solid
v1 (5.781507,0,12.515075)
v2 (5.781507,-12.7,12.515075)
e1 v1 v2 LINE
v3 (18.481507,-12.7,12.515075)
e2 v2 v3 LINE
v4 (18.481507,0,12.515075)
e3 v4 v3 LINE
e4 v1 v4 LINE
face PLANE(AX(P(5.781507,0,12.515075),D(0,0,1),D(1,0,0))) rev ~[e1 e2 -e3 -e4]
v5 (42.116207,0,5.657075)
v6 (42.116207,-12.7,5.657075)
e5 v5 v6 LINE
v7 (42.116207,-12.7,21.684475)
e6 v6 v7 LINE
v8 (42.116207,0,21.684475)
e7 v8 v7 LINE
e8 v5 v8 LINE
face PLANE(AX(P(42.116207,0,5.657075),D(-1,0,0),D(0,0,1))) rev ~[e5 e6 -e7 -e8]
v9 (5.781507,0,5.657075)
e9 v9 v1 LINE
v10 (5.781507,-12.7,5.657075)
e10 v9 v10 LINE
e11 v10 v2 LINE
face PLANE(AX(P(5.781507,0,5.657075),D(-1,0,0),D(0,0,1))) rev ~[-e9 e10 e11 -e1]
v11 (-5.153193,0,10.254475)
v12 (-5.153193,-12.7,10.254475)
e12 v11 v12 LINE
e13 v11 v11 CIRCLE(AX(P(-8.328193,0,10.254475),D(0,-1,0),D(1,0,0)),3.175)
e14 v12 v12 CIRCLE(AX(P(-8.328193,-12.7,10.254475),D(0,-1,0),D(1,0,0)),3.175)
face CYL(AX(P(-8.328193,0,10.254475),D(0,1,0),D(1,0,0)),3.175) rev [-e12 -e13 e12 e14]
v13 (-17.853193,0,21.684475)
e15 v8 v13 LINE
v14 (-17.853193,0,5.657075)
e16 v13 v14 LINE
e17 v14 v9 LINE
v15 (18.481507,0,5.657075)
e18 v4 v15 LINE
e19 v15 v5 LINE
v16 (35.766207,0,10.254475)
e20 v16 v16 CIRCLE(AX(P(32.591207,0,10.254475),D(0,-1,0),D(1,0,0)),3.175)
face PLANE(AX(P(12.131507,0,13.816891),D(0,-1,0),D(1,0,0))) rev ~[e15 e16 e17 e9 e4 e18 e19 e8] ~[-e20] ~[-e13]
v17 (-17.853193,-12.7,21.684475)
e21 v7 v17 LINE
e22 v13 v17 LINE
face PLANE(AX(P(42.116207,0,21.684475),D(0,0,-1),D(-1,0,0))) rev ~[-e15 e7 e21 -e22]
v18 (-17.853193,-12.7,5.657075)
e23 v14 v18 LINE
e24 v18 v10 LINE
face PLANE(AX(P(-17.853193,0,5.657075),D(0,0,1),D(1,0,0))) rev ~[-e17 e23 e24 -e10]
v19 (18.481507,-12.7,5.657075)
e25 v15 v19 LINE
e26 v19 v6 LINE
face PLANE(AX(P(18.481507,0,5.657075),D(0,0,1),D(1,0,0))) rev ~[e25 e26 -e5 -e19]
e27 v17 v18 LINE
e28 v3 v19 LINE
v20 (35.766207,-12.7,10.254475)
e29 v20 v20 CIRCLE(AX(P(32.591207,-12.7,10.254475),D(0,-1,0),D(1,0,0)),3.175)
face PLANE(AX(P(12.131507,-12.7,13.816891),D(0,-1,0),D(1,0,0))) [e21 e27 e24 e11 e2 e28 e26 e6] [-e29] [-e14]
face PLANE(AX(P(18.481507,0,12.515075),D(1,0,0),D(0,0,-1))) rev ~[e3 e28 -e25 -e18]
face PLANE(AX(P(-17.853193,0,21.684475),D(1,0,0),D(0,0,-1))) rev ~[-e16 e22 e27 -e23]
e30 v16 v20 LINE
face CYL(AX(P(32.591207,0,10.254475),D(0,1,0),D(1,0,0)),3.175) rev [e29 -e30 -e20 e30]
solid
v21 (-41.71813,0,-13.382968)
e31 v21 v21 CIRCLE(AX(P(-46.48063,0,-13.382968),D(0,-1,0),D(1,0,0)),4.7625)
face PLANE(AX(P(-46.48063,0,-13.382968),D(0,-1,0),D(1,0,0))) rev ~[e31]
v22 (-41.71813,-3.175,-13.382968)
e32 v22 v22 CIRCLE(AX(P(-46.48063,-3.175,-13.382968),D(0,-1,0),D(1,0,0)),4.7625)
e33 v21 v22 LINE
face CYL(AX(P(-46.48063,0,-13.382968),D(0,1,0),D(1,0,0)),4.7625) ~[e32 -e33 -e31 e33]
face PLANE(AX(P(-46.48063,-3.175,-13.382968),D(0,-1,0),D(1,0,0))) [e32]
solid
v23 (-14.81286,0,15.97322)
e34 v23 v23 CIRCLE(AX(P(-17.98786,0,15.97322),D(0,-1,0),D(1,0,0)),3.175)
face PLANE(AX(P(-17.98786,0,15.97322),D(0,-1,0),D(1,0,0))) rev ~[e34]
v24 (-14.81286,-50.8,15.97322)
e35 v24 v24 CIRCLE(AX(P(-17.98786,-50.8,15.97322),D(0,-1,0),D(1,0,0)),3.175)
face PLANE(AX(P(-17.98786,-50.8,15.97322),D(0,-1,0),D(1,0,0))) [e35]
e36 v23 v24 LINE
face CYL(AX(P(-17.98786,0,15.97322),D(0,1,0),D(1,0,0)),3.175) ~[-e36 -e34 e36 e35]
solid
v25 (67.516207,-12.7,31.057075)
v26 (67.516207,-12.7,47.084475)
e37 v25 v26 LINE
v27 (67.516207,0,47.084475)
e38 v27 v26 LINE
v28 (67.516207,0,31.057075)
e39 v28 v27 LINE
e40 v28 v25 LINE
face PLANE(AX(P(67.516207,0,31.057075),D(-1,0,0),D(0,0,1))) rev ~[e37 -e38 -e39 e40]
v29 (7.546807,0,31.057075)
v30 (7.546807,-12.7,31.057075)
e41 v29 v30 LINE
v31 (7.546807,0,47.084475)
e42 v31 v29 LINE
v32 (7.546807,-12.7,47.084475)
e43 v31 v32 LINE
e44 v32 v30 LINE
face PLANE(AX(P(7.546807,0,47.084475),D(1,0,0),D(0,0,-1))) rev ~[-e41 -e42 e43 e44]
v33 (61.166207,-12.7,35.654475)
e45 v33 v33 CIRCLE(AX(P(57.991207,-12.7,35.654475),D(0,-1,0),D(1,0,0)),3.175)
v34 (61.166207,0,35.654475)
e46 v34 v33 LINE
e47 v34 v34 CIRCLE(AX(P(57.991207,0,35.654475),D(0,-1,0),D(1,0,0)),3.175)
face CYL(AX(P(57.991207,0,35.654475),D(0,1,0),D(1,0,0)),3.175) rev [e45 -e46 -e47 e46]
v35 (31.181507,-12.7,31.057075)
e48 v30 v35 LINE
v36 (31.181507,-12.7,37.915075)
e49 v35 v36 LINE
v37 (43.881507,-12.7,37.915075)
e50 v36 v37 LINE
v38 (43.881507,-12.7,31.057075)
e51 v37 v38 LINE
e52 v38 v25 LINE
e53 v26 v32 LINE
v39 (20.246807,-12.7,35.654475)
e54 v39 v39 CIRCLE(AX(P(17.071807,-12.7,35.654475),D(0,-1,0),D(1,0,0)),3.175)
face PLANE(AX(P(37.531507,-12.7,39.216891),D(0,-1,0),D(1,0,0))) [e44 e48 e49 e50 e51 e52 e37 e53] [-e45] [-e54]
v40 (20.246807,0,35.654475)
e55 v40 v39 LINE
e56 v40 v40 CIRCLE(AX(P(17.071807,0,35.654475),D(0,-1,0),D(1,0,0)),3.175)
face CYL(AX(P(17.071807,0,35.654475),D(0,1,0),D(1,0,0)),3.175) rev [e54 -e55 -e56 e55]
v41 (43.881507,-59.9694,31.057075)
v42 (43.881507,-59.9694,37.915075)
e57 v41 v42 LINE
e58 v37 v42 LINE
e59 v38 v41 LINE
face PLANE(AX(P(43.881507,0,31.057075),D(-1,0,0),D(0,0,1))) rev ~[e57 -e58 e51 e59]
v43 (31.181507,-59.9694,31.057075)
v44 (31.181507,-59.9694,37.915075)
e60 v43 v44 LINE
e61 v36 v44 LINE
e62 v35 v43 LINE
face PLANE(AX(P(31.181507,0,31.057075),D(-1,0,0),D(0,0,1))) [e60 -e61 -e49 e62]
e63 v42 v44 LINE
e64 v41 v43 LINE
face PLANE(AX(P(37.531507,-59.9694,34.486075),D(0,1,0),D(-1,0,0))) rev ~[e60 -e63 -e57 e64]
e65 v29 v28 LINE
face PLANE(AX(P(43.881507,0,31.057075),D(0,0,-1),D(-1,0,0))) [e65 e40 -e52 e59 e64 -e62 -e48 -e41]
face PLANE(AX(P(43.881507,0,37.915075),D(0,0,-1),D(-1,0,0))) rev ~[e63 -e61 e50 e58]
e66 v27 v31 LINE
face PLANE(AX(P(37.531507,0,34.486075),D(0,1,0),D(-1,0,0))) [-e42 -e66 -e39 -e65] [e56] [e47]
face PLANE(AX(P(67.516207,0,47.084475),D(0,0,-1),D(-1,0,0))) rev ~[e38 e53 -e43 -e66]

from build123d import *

# Parameters (mm, degrees)
F0_R     = 3.175
F1_DEPTH = 12.7
F3_W     = 12.7
F3_H     = 6.858
F4_DEPTH = 59.9694
F6_R     = 3.175
F7_DEPTH = 50.8
F8_R     = 4.7625
F9_DEPTH = 3.175


# Not quite as in the source:
# - a feature of the source that left no trace in its solid (it failed there, or was rolled back) is left out


with BuildPart() as f1:
    # F0 (on Front) → F1 (new body)
    with BuildSketch(Plane.XZ):
        Polygon((42.1162071086, 21.6844746424), (-17.8531928914, 21.6844746424), (-17.8531928914, 5.6570746424), (5.7815071086, 5.6570746424), (5.7815071086, 12.5150746424), (18.4815071086, 12.5150746424), (18.4815071086, 5.6570746424), (42.1162071086, 5.6570746424), align=None)
        with Locations((-8.3281928914, 10.2544746424)):
            Circle(F0_R, mode=Mode.SUBTRACT)
        with Locations((32.5912071086, 10.2544746424)):
            Circle(F0_R, mode=Mode.SUBTRACT)
    extrude(amount=F1_DEPTH)


with BuildPart() as f2_1:
    # F2: copy of F1
    add(f1.part.moved(Location((25.4, 0, 25.4))))

    # F3 (on face) → F4 (join)
    with BuildSketch(Plane(origin=(0, 0, 0), x_dir=(-1, 0, 0), z_dir=(0, 1, 0))):
        with Locations((-37.5315071086, 34.4860746424)):
            Rectangle(F3_W, F3_H)
    extrude(amount=-F4_DEPTH)


with BuildPart() as f7:
    # F6 (on Front) → F7 (new body)
    with BuildSketch(Plane.XZ):
        with Locations((-17.9878603667, 15.973219648)):
            Circle(F6_R)
    extrude(amount=F7_DEPTH)


with BuildPart() as f9:
    # F8 (on Front) → F9 (new body)
    with BuildSketch(Plane.XZ):
        with Locations((-46.4806295931, -13.3829684928)):
            Circle(F8_R)
    extrude(amount=F9_DEPTH)


solid = Compound([f1.part, f2_1.part, f7.part, f9.part])
